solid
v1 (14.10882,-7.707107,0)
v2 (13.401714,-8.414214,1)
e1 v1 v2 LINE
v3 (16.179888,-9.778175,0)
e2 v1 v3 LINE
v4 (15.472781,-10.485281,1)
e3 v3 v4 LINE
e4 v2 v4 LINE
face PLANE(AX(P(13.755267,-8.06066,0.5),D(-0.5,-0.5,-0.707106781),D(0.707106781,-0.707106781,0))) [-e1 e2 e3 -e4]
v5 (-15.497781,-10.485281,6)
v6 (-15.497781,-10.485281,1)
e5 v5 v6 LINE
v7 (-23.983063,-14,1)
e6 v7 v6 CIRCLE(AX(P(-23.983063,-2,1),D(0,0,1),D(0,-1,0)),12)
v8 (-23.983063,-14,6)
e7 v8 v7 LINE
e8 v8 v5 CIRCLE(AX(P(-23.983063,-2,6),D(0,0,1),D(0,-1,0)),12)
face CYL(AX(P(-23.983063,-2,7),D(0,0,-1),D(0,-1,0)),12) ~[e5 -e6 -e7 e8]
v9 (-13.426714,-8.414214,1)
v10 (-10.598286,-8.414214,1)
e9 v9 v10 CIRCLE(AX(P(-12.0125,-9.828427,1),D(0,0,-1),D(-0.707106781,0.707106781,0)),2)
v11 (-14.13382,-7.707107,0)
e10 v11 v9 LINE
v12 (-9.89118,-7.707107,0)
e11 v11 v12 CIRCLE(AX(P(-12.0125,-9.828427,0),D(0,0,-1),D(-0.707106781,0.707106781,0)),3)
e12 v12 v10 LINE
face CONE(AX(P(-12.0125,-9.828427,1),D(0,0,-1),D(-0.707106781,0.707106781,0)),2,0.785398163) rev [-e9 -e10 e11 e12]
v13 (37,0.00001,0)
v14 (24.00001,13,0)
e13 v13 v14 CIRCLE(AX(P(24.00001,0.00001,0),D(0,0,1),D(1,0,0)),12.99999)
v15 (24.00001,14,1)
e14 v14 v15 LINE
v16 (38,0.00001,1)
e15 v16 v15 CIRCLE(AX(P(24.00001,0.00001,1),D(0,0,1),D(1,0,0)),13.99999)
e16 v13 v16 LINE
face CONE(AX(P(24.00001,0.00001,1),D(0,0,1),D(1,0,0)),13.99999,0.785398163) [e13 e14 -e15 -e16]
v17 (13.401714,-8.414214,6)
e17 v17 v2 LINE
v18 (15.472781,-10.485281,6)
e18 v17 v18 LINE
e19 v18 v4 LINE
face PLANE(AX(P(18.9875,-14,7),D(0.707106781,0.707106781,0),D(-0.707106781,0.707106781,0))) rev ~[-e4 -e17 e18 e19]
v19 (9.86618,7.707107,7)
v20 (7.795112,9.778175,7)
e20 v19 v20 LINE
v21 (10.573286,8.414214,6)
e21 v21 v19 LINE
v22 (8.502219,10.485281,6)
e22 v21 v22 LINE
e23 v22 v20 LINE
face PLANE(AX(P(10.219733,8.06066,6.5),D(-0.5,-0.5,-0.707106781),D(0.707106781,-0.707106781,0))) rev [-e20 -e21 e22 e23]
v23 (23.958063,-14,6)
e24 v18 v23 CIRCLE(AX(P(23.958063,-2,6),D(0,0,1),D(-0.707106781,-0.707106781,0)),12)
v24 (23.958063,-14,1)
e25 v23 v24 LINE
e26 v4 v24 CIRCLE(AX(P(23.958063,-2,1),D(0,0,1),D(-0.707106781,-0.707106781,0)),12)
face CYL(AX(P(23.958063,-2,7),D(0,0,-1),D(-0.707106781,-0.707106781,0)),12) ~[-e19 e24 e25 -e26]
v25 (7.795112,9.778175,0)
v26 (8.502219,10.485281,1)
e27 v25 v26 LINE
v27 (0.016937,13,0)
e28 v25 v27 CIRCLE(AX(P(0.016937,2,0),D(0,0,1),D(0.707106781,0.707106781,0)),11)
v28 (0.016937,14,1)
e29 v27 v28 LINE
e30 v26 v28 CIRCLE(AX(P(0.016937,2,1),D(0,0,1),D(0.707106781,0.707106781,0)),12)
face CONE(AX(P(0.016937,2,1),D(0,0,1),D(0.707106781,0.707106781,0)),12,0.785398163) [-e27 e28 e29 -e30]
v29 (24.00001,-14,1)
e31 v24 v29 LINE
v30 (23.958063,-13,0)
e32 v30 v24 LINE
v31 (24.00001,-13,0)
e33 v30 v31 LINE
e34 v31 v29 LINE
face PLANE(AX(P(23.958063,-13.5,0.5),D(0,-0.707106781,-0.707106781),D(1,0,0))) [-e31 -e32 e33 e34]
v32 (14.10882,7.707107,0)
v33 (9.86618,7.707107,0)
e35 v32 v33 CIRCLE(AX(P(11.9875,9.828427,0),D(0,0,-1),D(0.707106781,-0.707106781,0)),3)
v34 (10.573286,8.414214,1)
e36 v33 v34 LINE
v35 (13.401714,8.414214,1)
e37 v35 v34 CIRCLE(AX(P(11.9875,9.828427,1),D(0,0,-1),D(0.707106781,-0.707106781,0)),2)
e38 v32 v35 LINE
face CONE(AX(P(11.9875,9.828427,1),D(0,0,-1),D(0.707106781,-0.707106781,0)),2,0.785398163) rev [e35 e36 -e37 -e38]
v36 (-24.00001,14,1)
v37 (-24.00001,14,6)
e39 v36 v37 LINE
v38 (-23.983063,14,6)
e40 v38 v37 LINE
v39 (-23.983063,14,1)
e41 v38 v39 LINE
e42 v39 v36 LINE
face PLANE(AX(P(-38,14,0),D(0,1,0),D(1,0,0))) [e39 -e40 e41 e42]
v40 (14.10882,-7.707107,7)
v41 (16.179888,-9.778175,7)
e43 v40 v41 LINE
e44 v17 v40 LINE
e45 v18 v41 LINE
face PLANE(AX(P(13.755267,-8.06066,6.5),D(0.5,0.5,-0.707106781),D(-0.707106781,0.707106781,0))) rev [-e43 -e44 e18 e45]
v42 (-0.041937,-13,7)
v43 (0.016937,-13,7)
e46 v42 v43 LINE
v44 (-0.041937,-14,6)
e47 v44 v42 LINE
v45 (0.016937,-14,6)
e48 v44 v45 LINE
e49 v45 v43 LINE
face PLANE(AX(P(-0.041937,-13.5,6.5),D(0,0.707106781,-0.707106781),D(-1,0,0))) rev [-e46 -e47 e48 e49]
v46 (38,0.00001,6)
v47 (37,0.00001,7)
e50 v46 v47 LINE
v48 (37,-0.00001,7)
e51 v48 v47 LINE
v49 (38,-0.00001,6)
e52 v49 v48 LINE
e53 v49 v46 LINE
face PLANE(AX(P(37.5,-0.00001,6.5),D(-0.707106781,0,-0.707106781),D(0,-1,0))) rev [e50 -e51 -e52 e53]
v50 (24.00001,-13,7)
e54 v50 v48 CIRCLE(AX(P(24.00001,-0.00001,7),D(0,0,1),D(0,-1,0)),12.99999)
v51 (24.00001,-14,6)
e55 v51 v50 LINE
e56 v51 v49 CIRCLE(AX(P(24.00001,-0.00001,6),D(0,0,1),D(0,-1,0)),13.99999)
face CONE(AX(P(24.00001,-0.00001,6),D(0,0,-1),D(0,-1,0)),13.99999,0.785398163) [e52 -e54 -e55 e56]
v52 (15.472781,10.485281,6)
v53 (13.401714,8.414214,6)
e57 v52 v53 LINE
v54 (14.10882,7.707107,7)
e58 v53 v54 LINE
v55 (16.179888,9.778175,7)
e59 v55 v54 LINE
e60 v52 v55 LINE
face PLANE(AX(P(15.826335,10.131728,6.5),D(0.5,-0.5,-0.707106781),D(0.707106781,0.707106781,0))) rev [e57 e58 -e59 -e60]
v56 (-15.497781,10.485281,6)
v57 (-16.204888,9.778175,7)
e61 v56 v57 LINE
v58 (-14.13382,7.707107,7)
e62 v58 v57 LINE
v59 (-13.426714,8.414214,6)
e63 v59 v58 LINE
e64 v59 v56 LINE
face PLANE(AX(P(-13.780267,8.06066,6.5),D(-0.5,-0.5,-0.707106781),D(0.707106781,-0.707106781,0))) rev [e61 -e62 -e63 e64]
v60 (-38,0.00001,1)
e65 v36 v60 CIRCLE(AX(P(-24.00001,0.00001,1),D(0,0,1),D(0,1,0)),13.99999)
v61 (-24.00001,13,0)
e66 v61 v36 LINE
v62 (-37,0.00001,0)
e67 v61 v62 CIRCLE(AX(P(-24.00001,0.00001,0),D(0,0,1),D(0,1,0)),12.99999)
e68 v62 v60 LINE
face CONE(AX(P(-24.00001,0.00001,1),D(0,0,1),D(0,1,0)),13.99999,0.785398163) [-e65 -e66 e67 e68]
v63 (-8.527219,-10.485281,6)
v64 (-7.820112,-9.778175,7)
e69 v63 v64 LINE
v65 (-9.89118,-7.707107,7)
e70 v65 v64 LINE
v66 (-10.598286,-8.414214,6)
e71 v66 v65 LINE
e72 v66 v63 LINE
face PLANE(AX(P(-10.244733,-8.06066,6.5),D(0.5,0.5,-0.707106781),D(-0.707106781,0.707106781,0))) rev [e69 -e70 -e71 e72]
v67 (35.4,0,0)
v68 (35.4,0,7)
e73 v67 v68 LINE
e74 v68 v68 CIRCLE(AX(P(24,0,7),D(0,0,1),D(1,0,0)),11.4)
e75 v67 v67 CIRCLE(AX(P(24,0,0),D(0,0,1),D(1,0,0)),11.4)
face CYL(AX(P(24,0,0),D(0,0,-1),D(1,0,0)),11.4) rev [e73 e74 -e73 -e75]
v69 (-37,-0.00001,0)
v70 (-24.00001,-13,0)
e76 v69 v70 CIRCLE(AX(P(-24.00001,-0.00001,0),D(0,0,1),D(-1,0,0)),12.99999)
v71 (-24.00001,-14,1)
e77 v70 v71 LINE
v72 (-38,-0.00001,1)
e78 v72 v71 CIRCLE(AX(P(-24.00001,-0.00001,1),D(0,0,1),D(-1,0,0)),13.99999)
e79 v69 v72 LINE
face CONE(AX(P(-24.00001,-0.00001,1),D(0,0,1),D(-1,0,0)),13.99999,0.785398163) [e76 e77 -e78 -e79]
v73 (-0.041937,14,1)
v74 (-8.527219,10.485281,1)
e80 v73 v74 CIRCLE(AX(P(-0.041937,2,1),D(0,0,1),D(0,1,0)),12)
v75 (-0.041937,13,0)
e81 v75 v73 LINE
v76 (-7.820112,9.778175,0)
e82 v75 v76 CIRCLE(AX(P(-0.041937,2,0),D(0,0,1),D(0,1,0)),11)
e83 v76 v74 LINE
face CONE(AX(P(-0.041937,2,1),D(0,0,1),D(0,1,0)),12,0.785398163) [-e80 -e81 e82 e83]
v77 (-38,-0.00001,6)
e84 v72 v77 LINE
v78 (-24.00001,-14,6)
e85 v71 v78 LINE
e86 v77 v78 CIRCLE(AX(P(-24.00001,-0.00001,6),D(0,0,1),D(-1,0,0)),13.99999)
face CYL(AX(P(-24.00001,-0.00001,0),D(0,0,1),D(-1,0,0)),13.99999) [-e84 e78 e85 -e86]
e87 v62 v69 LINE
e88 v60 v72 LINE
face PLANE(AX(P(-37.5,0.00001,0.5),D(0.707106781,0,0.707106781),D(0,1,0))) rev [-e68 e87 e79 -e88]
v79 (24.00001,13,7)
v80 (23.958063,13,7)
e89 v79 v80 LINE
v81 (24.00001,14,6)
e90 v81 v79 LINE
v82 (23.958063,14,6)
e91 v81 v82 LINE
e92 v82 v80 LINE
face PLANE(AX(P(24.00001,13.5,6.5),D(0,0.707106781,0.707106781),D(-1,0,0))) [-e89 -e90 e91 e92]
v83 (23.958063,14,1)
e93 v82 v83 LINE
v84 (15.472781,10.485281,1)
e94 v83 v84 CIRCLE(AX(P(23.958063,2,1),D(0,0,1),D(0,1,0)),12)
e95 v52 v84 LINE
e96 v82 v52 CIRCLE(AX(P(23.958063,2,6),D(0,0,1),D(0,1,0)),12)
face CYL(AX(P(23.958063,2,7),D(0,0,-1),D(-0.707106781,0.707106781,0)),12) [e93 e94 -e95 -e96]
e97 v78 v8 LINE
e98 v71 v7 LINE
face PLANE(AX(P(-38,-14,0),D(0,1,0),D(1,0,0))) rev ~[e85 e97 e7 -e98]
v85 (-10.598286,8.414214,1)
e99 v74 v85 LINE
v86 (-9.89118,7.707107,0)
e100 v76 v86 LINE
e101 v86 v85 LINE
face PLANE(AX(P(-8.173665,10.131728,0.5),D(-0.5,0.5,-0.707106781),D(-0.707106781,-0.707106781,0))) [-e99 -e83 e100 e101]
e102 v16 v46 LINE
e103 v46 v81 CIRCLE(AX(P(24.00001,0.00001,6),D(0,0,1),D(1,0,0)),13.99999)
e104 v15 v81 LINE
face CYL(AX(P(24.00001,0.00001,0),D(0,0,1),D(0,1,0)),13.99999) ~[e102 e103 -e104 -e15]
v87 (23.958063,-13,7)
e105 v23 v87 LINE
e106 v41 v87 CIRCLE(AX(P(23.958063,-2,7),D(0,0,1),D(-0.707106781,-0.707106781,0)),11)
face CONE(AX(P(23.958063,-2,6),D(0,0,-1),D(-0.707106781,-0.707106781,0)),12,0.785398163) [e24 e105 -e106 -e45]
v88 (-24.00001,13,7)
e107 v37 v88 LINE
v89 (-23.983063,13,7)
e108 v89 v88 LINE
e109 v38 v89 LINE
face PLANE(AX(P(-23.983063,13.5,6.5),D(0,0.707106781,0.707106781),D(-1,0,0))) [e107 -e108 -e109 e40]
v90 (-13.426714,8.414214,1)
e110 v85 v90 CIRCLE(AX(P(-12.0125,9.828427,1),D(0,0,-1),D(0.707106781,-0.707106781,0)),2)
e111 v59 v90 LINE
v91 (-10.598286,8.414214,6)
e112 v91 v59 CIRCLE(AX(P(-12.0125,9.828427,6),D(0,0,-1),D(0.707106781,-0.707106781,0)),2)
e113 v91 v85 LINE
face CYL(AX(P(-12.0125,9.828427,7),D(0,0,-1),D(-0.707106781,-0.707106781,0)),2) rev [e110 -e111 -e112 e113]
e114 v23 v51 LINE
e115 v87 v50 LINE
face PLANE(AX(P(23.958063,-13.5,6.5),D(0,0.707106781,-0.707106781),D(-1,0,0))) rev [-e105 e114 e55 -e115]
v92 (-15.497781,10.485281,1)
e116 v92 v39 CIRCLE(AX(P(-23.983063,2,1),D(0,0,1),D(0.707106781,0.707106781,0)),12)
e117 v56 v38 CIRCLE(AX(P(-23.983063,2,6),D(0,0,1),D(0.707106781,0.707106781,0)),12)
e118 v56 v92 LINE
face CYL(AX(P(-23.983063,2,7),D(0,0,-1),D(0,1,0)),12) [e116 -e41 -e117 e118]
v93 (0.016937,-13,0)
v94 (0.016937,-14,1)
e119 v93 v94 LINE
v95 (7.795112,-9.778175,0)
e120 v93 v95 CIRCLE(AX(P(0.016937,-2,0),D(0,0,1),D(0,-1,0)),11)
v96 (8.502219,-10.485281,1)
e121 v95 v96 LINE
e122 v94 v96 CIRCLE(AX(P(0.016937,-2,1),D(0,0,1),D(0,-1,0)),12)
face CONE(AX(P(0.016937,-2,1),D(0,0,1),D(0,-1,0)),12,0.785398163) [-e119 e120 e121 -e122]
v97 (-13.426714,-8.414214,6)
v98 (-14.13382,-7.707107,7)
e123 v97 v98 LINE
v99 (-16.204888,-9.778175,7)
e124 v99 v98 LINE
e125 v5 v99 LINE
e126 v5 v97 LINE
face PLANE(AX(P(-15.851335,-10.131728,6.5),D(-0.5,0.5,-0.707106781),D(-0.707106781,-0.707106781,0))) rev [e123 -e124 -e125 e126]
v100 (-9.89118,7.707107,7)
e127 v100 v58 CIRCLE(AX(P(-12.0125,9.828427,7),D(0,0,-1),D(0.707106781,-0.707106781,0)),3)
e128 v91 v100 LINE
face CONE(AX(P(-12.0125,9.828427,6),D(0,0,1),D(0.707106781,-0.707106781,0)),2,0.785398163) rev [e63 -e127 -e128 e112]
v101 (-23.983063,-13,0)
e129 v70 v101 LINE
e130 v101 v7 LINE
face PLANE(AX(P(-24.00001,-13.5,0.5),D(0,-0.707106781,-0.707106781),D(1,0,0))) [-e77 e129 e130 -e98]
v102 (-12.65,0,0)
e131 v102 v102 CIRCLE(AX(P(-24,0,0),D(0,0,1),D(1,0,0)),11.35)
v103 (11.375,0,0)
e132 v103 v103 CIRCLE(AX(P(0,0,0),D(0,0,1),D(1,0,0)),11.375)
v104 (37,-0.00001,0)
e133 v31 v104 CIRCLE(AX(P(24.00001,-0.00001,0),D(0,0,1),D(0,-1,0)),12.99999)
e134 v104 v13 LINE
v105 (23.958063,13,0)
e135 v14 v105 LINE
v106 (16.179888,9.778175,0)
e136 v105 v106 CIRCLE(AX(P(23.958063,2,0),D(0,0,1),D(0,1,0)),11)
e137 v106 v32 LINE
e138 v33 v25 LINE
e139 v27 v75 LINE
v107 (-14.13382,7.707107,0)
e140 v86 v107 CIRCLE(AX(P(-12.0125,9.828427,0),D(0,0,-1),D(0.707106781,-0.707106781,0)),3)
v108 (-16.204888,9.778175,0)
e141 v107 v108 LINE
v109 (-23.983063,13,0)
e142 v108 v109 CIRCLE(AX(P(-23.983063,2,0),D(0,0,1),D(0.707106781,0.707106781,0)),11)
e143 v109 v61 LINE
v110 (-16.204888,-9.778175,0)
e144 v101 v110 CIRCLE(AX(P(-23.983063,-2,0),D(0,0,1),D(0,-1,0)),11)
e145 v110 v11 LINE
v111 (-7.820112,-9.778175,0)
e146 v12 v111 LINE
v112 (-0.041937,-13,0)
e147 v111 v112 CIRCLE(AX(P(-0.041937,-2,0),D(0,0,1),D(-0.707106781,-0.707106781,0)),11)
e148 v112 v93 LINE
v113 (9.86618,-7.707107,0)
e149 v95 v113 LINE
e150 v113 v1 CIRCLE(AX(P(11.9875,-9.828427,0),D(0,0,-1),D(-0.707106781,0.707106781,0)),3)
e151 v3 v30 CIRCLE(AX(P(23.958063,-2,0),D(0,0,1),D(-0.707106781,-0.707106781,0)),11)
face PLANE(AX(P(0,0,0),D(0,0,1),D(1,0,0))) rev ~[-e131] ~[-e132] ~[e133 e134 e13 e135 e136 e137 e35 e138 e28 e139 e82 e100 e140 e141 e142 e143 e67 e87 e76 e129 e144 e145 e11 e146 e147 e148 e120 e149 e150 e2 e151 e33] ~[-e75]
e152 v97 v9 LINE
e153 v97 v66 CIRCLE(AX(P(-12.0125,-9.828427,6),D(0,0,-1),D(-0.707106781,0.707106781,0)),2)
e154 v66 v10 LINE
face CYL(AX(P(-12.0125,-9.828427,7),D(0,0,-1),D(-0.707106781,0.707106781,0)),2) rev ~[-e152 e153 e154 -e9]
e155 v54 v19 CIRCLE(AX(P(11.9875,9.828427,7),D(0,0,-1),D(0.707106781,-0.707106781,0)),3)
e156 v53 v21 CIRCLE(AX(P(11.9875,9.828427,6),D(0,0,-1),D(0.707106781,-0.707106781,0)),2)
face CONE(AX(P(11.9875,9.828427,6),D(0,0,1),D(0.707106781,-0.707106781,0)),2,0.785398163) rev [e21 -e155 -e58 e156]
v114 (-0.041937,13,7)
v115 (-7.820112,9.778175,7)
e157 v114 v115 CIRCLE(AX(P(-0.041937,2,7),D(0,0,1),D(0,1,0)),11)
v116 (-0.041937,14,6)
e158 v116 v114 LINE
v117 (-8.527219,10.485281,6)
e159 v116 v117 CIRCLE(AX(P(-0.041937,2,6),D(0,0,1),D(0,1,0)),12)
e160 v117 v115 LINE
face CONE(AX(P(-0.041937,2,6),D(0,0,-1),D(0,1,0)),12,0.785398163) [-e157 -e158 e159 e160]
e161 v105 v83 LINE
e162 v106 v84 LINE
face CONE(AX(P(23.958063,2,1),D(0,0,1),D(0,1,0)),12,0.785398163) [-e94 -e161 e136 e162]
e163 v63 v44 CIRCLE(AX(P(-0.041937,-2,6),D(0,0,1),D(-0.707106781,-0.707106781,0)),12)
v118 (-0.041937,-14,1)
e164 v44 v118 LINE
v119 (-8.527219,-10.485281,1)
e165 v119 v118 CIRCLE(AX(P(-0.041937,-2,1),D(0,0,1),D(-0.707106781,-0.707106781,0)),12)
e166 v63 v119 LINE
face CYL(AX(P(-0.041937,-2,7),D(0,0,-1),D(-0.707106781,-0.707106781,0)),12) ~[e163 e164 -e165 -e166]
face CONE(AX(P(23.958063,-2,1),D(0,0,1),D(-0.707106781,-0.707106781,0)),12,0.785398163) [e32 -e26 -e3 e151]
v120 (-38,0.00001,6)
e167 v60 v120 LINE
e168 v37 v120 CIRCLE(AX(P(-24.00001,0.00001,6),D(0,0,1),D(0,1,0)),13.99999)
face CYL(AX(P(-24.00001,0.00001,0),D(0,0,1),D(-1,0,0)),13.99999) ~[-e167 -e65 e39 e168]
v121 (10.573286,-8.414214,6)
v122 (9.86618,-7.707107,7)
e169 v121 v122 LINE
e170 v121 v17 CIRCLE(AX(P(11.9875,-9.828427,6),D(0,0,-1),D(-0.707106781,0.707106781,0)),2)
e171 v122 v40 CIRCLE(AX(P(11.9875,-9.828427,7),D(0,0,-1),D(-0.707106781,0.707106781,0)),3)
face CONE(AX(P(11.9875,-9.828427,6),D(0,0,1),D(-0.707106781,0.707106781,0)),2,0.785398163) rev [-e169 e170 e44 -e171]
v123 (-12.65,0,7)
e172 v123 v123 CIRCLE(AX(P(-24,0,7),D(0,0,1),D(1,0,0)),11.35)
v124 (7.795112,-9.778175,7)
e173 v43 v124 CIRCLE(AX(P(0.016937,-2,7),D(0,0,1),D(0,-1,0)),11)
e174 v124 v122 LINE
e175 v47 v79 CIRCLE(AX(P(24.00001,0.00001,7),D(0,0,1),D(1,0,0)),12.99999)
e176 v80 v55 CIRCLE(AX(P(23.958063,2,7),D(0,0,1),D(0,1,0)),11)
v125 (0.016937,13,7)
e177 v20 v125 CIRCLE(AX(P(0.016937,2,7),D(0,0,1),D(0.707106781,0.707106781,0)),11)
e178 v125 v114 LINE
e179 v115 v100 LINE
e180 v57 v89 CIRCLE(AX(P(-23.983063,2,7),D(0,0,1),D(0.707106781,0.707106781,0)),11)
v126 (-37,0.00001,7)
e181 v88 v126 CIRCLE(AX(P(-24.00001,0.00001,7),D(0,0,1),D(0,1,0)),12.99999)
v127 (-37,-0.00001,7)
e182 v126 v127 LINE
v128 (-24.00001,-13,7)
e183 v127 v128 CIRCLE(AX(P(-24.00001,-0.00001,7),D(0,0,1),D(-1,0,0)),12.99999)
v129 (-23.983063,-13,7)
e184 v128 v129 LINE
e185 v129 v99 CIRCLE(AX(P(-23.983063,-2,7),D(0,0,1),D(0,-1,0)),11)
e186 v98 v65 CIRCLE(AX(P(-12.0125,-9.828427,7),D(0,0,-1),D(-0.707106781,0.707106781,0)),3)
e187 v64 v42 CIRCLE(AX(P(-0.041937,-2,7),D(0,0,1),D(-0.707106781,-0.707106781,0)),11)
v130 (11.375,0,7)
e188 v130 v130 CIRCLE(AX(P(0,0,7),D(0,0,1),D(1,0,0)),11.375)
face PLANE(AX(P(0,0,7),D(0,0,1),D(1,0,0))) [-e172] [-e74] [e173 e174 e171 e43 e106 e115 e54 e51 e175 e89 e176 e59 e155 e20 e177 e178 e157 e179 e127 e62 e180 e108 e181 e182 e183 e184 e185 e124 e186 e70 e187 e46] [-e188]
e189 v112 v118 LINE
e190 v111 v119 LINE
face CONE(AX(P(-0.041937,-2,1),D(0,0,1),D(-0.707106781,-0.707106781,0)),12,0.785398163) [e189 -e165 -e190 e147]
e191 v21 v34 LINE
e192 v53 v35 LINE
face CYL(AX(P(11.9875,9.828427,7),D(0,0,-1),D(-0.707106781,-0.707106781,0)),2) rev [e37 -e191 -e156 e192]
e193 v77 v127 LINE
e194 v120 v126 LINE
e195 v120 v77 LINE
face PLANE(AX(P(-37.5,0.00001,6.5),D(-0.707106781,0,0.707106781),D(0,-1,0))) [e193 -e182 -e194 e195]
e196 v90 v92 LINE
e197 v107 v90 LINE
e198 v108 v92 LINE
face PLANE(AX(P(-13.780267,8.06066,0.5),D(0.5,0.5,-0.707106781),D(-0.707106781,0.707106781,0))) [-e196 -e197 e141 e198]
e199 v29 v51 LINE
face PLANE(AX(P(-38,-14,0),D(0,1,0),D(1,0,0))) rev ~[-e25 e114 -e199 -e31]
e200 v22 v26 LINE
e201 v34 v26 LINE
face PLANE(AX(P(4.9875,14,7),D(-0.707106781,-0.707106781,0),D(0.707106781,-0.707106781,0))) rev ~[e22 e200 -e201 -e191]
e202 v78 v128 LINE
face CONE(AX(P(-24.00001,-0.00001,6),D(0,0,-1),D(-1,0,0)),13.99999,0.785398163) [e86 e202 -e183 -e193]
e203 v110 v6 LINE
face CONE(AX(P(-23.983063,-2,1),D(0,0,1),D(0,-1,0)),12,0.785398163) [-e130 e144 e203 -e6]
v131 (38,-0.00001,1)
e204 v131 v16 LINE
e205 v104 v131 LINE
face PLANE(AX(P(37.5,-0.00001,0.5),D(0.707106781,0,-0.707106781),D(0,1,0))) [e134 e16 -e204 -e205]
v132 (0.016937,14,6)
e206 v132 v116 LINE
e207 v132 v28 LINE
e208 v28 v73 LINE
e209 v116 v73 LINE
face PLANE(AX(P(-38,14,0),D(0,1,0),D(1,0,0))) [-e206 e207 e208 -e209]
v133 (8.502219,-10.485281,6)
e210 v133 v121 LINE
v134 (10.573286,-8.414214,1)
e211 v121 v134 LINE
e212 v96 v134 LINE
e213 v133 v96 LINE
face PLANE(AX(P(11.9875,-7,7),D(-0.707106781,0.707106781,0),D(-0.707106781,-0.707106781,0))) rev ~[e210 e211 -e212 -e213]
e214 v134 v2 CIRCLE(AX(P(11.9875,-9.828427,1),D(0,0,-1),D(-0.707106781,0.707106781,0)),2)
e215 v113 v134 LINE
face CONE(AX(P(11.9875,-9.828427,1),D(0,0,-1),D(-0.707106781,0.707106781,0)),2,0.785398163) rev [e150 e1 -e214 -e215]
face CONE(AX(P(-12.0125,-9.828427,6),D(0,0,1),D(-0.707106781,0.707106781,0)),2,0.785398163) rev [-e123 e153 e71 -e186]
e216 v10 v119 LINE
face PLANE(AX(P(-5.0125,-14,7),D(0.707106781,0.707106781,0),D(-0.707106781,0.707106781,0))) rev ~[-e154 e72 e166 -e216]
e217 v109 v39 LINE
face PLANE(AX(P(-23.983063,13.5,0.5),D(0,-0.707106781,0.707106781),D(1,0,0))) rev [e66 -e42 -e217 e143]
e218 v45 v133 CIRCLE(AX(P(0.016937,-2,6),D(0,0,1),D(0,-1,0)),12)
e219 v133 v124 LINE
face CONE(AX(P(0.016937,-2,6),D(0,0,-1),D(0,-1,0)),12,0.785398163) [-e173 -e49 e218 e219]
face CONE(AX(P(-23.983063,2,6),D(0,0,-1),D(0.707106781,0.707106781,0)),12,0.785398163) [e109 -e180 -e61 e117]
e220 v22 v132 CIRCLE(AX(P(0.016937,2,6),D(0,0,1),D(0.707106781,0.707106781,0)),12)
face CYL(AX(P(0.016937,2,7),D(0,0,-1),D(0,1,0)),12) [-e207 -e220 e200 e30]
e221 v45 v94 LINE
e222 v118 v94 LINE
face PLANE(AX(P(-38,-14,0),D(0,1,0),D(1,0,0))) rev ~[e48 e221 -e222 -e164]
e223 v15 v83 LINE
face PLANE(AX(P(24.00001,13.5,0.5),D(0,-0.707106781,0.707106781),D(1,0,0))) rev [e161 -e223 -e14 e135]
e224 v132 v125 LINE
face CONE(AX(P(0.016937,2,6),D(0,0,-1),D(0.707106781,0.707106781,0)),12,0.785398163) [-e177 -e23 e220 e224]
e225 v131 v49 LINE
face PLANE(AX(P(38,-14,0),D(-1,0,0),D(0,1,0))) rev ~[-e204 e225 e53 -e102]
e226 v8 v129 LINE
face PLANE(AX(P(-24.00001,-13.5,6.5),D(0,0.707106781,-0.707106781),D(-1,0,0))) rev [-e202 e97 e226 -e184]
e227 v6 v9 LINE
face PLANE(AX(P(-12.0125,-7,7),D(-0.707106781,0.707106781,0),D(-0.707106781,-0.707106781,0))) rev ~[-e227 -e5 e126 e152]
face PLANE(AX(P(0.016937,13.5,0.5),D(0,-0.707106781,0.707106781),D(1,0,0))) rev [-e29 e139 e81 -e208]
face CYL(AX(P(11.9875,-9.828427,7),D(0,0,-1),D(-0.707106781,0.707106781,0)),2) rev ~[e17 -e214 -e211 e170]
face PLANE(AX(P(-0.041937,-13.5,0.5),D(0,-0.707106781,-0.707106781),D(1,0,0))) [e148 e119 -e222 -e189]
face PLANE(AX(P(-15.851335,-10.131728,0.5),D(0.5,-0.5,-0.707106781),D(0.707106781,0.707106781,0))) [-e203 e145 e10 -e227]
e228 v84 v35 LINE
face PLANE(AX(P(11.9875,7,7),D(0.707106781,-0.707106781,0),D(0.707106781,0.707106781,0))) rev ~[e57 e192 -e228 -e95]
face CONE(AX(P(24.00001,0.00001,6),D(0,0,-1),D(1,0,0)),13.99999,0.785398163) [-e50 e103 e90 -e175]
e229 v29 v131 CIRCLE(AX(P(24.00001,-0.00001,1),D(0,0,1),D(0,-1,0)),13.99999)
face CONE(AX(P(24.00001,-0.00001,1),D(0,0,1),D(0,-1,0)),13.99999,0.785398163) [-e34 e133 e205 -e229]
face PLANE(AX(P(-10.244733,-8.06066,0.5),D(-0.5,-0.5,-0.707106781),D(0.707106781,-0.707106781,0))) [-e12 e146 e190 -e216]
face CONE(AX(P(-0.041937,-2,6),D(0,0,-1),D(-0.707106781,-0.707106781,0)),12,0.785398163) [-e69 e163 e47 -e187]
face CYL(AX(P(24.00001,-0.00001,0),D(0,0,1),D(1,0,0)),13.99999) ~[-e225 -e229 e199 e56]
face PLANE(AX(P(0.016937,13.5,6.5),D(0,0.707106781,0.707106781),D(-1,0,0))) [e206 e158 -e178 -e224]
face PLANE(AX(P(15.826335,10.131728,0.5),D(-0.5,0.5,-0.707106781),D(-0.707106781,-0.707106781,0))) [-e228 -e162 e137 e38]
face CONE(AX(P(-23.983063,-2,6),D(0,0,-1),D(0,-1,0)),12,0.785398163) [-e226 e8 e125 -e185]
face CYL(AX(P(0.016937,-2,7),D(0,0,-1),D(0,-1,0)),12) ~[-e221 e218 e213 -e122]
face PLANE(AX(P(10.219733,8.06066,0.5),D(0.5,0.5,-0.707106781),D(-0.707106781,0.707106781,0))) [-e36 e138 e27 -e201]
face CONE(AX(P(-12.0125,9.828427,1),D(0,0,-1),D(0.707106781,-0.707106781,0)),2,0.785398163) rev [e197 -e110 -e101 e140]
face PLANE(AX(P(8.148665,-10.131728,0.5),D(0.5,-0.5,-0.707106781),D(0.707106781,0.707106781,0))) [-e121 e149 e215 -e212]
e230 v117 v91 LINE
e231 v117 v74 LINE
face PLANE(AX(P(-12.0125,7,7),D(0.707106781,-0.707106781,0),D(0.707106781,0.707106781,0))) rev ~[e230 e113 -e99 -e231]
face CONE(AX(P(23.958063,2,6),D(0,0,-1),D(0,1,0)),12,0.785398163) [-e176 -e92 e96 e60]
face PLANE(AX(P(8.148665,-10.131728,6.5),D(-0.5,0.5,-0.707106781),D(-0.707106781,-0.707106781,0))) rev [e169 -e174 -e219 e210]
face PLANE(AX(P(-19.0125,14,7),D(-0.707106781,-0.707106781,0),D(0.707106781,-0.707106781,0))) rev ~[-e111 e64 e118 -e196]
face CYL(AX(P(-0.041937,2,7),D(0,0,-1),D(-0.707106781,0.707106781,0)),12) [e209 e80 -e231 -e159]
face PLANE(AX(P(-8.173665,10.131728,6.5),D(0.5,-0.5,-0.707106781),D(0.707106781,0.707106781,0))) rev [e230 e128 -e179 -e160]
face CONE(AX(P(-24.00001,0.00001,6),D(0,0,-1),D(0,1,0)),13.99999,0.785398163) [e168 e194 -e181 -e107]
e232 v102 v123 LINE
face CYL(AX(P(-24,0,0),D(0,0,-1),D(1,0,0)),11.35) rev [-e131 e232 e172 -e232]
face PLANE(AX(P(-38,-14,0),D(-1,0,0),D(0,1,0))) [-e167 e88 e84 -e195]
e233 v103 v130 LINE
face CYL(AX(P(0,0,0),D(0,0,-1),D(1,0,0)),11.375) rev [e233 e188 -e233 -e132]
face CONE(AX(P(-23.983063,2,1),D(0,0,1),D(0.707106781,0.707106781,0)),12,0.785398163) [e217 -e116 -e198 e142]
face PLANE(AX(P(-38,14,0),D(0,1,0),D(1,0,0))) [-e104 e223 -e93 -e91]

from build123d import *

# Parameters (mm, degrees)
F0_W     = 76
F0_H     = 28
F0_R     = 11.35
F0_R_2   = 11.375
F0_R_3   = 11.4
F1_DEPTH = 7
F3_DEPTH = 7.001
F4_R     = 13.99999
F5_R     = 12
F6_R     = 2
F7_SIZE  = 1


# Not quite as in the source:
# - a fillet or chamfer is up to 0.001 mm smaller than in the source, because OpenCascade refuses the exact size


with BuildPart() as f1:
    # F0 (on Top) → F1 (new body)
    with BuildSketch(Plane.XY):
        Rectangle(F0_W, F0_H)
        with Locations((-24, 0)):
            Circle(F0_R, mode=Mode.SUBTRACT)
        Circle(F0_R_2, mode=Mode.SUBTRACT)
        with Locations((24, 0)):
            Circle(F0_R_3, mode=Mode.SUBTRACT)
    extrude(amount=F1_DEPTH)

    # F2 (on face) → F3 (cut, through all)
    with BuildSketch(Plane.XY.offset(7)):
        Polygon((-5.0125, 14), (-19.0125, 14), (-12.0125, 7), align=None)
        Polygon((18.9875, 14), (4.9875, 14), (11.9875, 7), align=None)
        Polygon((11.9875, -7), (4.9875, -14), (18.9875, -14), align=None)
        Polygon((-5.0125, -14), (-12.0125, -7), (-19.0125, -14), align=None)
    extrude(amount=-F3_DEPTH, mode=Mode.SUBTRACT)

    # F4 (radius 14 in the source; OpenCascade refuses exactly that, so slightly less here)
    f4_edges = [f1.edges().sort_by_distance(p)[0] for p in [
        (-38, -14, 3.5),
        (-38, 14, 3.5),
        (38, -14, 3.5),
        (38, 14, 3.5),
    ]]
    fillet(f4_edges, radius=F4_R)

    # F5
    f5_edges = [f1.edges().sort_by_distance(p)[0] for p in [
        (-19.0125, -14, 3.5),
        (-5.0125, -14, 3.5),
        (4.9875, -14, 3.5),
        (18.9875, -14, 3.5),
        (18.9875, 14, 3.5),
        (4.9875, 14, 3.5),
        (-5.0125, 14, 3.5),
        (-19.0125, 14, 3.5),
    ]]
    fillet(f5_edges, radius=F5_R)

    # F6
    f6_edges = [f1.edges().sort_by_distance(p)[0] for p in [
        (-12.0125, -7, 3.5),
        (11.9875, -7, 3.5),
        (-12.0125, 7, 3.5),
        (11.9875, 7, 3.5),
    ]]
    fillet(f6_edges, radius=F6_R)

    # F7
    f7_edges = [f1.edges().sort_by_distance(p)[0] for p in [
        (-4.634138, -13.086554, 7),
        (-4.634138, -13.086554, 0),
    ]]
    chamfer(f7_edges, length=F7_SIZE)


solid = f1.part
